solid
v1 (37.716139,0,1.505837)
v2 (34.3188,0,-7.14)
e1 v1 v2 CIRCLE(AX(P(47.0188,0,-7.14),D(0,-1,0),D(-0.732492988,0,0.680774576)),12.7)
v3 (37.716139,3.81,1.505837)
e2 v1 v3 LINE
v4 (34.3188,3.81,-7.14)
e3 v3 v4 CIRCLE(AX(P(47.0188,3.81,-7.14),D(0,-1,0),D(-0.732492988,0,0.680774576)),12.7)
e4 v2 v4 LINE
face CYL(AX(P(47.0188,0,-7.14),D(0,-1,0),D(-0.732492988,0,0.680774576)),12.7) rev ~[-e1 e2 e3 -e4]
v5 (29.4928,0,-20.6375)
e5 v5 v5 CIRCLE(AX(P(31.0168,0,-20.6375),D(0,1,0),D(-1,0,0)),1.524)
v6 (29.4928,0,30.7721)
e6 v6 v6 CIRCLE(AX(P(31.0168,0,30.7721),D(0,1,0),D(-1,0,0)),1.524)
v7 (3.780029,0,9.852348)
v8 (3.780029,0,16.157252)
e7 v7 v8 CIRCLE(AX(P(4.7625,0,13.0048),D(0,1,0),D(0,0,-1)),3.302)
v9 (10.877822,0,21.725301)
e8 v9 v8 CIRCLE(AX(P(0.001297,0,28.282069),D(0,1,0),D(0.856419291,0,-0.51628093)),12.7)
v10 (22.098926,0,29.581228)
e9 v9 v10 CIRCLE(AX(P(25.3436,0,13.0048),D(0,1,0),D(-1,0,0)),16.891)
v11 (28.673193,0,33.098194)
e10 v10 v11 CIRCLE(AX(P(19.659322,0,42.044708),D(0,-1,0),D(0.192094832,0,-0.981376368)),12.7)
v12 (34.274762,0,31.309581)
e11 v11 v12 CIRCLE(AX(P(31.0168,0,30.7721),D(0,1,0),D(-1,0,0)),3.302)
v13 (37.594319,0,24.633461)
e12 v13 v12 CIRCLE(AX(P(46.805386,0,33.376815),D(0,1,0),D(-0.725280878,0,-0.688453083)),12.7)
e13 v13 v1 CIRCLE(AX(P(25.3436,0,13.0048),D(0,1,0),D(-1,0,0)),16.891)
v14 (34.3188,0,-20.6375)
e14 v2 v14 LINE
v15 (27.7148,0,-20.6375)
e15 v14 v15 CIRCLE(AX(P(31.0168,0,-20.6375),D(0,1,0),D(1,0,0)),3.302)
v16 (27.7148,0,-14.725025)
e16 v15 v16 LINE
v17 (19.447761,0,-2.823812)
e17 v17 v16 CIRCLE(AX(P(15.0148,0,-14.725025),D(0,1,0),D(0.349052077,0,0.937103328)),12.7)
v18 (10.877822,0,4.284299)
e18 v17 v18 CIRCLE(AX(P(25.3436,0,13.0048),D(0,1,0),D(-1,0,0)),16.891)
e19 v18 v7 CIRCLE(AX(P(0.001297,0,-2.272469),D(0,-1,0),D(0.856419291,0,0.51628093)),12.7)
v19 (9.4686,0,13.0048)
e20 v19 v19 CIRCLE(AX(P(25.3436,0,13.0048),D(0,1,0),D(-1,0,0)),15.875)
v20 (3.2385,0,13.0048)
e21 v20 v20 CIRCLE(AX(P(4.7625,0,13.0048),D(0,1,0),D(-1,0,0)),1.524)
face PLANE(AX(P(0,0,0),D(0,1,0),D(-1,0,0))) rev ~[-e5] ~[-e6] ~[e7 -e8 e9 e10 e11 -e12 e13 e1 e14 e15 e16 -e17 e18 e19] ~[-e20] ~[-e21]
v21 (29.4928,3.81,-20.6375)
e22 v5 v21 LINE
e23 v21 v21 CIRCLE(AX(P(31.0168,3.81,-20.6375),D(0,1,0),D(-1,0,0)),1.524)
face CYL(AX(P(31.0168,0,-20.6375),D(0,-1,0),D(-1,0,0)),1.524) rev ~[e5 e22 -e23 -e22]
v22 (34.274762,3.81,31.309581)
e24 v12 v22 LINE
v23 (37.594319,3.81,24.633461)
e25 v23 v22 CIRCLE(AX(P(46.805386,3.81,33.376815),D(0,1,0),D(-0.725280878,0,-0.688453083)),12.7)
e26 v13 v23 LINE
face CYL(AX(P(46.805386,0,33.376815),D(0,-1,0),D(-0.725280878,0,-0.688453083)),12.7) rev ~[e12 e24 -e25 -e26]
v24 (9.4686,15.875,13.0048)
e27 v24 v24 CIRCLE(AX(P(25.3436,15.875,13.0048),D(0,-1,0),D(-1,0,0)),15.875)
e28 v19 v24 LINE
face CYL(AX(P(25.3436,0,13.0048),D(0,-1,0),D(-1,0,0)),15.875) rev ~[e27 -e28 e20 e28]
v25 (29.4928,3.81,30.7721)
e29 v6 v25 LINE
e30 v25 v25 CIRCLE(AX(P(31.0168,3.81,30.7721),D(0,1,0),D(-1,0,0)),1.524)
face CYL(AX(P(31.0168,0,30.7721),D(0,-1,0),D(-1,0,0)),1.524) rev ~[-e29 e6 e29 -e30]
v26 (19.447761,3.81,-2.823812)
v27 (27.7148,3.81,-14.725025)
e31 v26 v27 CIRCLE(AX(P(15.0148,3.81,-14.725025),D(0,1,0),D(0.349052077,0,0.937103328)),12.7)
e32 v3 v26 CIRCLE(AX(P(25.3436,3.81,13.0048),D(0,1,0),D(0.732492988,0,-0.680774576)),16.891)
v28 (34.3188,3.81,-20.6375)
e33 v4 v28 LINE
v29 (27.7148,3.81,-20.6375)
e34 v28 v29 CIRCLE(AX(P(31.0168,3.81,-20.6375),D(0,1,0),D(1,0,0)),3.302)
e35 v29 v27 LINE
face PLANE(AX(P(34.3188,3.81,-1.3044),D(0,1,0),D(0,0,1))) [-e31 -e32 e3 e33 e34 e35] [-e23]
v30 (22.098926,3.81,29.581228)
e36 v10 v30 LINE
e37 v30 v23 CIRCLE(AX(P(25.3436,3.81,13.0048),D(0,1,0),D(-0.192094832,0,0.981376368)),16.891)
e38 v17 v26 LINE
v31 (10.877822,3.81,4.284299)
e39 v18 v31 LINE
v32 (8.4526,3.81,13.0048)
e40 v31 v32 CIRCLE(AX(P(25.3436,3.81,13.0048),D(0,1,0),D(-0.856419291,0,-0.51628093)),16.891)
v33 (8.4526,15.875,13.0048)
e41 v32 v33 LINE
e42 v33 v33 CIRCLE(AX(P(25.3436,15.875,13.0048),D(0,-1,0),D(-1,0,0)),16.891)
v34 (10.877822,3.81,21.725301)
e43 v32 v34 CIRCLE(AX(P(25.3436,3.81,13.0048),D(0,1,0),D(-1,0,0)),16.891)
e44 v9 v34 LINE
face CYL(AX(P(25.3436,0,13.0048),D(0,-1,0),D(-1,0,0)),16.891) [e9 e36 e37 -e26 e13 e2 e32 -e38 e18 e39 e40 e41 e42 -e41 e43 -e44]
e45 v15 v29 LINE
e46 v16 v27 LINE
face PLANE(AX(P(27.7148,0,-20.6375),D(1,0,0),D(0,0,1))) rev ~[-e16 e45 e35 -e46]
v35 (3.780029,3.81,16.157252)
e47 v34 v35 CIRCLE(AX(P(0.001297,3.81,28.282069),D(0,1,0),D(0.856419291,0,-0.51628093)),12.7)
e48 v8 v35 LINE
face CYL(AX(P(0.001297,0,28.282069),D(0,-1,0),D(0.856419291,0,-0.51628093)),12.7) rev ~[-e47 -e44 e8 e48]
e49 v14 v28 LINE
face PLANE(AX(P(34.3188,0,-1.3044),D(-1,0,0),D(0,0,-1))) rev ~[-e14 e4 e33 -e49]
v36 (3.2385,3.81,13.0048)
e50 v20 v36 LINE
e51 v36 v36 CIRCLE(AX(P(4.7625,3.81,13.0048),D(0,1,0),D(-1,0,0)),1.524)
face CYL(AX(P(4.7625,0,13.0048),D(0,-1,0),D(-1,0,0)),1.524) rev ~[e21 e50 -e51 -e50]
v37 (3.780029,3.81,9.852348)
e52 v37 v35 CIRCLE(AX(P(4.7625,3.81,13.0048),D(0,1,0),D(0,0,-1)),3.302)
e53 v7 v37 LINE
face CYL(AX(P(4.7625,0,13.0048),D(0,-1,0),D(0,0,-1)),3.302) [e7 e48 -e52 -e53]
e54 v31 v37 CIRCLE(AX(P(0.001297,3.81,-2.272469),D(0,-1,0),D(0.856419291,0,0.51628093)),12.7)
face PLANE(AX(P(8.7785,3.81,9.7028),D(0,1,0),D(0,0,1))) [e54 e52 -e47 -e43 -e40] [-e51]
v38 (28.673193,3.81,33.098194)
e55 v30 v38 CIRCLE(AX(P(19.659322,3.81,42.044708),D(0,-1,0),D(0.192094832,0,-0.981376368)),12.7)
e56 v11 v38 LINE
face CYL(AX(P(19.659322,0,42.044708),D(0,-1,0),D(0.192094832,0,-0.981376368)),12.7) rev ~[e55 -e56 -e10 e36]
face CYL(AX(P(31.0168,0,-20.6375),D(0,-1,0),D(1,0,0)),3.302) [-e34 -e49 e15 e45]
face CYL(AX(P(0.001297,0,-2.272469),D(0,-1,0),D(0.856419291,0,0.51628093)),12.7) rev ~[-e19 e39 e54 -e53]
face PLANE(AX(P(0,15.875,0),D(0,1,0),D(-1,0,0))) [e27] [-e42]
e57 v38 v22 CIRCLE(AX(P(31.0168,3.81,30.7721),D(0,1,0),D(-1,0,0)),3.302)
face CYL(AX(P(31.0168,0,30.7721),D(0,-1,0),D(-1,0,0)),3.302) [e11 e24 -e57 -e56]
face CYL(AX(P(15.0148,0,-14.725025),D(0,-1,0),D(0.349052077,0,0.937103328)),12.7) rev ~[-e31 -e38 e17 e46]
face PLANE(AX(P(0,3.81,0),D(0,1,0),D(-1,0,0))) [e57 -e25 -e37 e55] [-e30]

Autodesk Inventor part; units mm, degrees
ref_plane "YZ Plane" through (0, 0, 0) normal (1, 0, 0) x (0, 1, 0)
ref_plane "XZ Plane" through (0, 0, 0) normal (0, 1, 0) x (-1, 0, 0)
ref_plane "XY Plane" through (0, 0, 0) normal (0, 0, 1) x (1, 0, 0)
sketch "Sketch2" plane through (0, 0, 0) normal (0, 1, 0) x (-1, 0, 0)
  circle A0 centre (-4.7625, 13.0048) radius 1.524 construction
  circle A1 centre (-25.3436, 13.0048) radius 6.35 construction
  circle A2 centre (-31.0168, 30.7721) radius 1.524 construction
  circle A3 centre (-31.0168, -20.6375) radius 1.524 construction
  line L0 (-38.1807, -25.4) -> (-38.1807, 35.5346) construction
  line L1 (-23.8528, -25.4) -> (-38.1807, -25.4) construction
  line L2 (-23.8528, 0) -> (-23.8528, -25.4) construction
  line L3 (0, 0) -> (-23.8528, 0) construction
  line L4 (0, 26.0096) -> (0, 0) construction
  line L5 (-23.8528, 26.0096) -> (0, 26.0096) construction
  line L6 (-23.8528, 26.0096) -> (-23.8528, 35.5346) construction
  line L7 (-38.1807, 35.5346) -> (-23.8528, 35.5346) construction
  point P0 (-23.8528, 13.0048)
  dimension "d3" = 3.048
  dimension "d4" = 12.7
  dimension "d5" = 90
  dimension "d6" = 23.8528
  dimension "d7" = 38.1807
  dimension "d8" = 26.0096
  dimension "d9" = 25.4
  dimension "d10" = 35.5346
  dimension "d11" = 0
  dimension "d12" = 0
  dimension "d13" = 23.8528
  dimension "d14" = 4.7625
  dimension "d15" = 13.0048
  dimension "d16" = 23.8528
  dimension "d17" = 13.0048
  dimension "d18" = 25.3436
  dimension "d19" = 13.0048
  dimension "d20" = 31.0167
  dimension "d21" = 30.7721
  dimension "d22" = 31.0167
  dimension "d23" = 20.6375
sketch "Sketch3" plane through (0, 0, 0) normal (0, 1, 0) x (-1, 0, 0)
  circle A0 centre (-25.3436, 13.0048) radius 15.875
  circle A1 centre (-31.0168, 30.7721) radius 1.524
  circle A2 centre (-4.7625, 13.0048) radius 1.524
  circle A3 centre (-31.0168, -20.6375) radius 1.524
  line L0 (-31.0168, 30.7721) -> (-31.0168, -20.6375) construction
  line L1 (-4.7625, 13.0048) -> (-31.0168, 13.0048) construction
  line L2 (-4.7625, 13.0048) -> (-3.2385, 13.0048) construction
  line L3 (-3.2385, 13.0048) -> (-3.2385, 32.2961) construction
  line L4 (-3.2385, 32.2961) -> (-31.0168, 32.2961) construction
  line L5 (-3.2385, 13.0048) -> (-3.2385, -22.1615) construction
  line L6 (-3.2385, -22.1615) -> (-31.0168, -22.1615) construction
  line L7 (-32.5408, 30.7721) -> (-32.5408, -22.1615) construction
  line L8 (-32.5408, -22.1615) -> (-31.0168, -22.1615) construction
  line L9 (-31.0168, 32.2961) -> (-32.5408, 32.2961) construction
  line L10 (-32.5408, 32.2961) -> (-32.5408, 30.7721) construction
  line L11 (-31.0168, 42.8789) -> (7.3443, 42.8789) construction
  line L12 (7.3443, 42.8789) -> (7.3443, 13.0048) construction
  line L13 (7.3443, 13.0048) -> (7.3443, -32.7443) construction
  line L14 (7.3443, -32.7443) -> (-15.7768, -32.7443) construction
  line L15 (-15.7768, -32.7443) -> (-27.8836, -32.7443) construction
  line L16 (-43.1236, 30.7721) -> (-43.1236, 42.8789) construction
  line L17 (-43.1236, 42.8789) -> (-31.0168, 42.8789) construction
  line L18 (-25.3436, 13.0048) -> (-35.5036, 13.0048) construction
  arc A4 (-25.3436, -2.8702) -> (-25.3436, 28.8798) centre (-25.3436, 13.0048) ccw
  line L19 (-27.8836, -32.7443) -> (-27.8836, -2.8702) construction
  line L20 (-43.1236, 28.8798) -> (-43.1236, 30.7721) construction
  line L21 (-34.3188, 30.7721) -> (-34.3188, 27.314)
  line L22 (-34.3188, -1.3044) -> (-34.3188, -20.6375)
  circle A5 centre (-25.3436, 13.0048) radius 16.891
  line L23 (-4.7625, 13.0048) -> (-25.3436, 13.0048) construction
  line L24 (-4.7625, 16.3068) -> (-8.7785, 16.3068)
  line L25 (-8.7785, 9.7028) -> (-4.7625, 9.7028)
  arc A6 (-4.7625, 9.7028) -> (-4.7625, 16.3068) centre (-4.7625, 13.0048) ccw
  line L26 (-31.0168, -20.6375) -> (-31.0168, 13.0048) construction
  line L27 (-27.7148, -20.6375) -> (-27.7148, -3.7189)
  line L28 (-34.3188, -1.3044) -> (-34.3188, -20.6375)
  arc A7 (-34.3188, -20.6375) -> (-27.7148, -20.6375) centre (-31.0168, -20.6375) ccw
  line L29 (-31.0168, 30.7721) -> (-31.0168, 13.0048) construction
  line L30 (-34.3188, 30.7721) -> (-34.3188, 27.314)
  arc A8 (-27.7148, 30.7721) -> (-34.3188, 30.7721) centre (-31.0168, 30.7721) ccw
  line L31 (-27.7148, 29.7285) -> (-27.7148, 30.7721)
  arc A9 (-30.2144, -23.8405) -> (-1.4605, 13.0048) centre (-39.4443, 13.0048) ccw construction
  arc A10 (-1.4605, 13.0048) -> (-32.2443, 33.8374) centre (-23.9015, 13.0048) ccw construction
  point P0 (0, 0)
  point P1 (-30.4236, 13.0048)
  point P2 (-15.053, 13.0048)
  point P3 (-31.0168, -3.8163)
  point P4 (-31.0168, 21.8885)
  dimension "d26" = 3.048
  dimension "d27" = 3.048
  dimension "d24" = 31.75
  dimension "d25" = 3.048
  dimension "d32" = 10.16
  dimension "d36" = 1.778
  dimension "d38" = 1.778
  dimension "d40" = 1.016
  dimension "d44" = 6.604
  dimension "d45" = 4.016
extrude "Extrusion1" add sketch "Sketch3" along normal blind 15.875 contours A5
extrude "Extrusion2" add sketch "Sketch3" along normal blind 3.81 contours A8 L31 A5 L21 | A5 L27 A7 L22 | L24 A6 L25 A5
fillet "Fillet1" radius 12.7 6 edges at (27.7148, 1.905, 29.7285) (34.3188, 1.905, 27.314) (34.3188, 1.905, -1.3044) (8.7785, 1.905, 9.7028) (27.7148, 1.905, -3.7189) (8.7785, 1.905, 16.3068)
properties part number "DPLX_P020_Camera Shroud Base_RevA"
